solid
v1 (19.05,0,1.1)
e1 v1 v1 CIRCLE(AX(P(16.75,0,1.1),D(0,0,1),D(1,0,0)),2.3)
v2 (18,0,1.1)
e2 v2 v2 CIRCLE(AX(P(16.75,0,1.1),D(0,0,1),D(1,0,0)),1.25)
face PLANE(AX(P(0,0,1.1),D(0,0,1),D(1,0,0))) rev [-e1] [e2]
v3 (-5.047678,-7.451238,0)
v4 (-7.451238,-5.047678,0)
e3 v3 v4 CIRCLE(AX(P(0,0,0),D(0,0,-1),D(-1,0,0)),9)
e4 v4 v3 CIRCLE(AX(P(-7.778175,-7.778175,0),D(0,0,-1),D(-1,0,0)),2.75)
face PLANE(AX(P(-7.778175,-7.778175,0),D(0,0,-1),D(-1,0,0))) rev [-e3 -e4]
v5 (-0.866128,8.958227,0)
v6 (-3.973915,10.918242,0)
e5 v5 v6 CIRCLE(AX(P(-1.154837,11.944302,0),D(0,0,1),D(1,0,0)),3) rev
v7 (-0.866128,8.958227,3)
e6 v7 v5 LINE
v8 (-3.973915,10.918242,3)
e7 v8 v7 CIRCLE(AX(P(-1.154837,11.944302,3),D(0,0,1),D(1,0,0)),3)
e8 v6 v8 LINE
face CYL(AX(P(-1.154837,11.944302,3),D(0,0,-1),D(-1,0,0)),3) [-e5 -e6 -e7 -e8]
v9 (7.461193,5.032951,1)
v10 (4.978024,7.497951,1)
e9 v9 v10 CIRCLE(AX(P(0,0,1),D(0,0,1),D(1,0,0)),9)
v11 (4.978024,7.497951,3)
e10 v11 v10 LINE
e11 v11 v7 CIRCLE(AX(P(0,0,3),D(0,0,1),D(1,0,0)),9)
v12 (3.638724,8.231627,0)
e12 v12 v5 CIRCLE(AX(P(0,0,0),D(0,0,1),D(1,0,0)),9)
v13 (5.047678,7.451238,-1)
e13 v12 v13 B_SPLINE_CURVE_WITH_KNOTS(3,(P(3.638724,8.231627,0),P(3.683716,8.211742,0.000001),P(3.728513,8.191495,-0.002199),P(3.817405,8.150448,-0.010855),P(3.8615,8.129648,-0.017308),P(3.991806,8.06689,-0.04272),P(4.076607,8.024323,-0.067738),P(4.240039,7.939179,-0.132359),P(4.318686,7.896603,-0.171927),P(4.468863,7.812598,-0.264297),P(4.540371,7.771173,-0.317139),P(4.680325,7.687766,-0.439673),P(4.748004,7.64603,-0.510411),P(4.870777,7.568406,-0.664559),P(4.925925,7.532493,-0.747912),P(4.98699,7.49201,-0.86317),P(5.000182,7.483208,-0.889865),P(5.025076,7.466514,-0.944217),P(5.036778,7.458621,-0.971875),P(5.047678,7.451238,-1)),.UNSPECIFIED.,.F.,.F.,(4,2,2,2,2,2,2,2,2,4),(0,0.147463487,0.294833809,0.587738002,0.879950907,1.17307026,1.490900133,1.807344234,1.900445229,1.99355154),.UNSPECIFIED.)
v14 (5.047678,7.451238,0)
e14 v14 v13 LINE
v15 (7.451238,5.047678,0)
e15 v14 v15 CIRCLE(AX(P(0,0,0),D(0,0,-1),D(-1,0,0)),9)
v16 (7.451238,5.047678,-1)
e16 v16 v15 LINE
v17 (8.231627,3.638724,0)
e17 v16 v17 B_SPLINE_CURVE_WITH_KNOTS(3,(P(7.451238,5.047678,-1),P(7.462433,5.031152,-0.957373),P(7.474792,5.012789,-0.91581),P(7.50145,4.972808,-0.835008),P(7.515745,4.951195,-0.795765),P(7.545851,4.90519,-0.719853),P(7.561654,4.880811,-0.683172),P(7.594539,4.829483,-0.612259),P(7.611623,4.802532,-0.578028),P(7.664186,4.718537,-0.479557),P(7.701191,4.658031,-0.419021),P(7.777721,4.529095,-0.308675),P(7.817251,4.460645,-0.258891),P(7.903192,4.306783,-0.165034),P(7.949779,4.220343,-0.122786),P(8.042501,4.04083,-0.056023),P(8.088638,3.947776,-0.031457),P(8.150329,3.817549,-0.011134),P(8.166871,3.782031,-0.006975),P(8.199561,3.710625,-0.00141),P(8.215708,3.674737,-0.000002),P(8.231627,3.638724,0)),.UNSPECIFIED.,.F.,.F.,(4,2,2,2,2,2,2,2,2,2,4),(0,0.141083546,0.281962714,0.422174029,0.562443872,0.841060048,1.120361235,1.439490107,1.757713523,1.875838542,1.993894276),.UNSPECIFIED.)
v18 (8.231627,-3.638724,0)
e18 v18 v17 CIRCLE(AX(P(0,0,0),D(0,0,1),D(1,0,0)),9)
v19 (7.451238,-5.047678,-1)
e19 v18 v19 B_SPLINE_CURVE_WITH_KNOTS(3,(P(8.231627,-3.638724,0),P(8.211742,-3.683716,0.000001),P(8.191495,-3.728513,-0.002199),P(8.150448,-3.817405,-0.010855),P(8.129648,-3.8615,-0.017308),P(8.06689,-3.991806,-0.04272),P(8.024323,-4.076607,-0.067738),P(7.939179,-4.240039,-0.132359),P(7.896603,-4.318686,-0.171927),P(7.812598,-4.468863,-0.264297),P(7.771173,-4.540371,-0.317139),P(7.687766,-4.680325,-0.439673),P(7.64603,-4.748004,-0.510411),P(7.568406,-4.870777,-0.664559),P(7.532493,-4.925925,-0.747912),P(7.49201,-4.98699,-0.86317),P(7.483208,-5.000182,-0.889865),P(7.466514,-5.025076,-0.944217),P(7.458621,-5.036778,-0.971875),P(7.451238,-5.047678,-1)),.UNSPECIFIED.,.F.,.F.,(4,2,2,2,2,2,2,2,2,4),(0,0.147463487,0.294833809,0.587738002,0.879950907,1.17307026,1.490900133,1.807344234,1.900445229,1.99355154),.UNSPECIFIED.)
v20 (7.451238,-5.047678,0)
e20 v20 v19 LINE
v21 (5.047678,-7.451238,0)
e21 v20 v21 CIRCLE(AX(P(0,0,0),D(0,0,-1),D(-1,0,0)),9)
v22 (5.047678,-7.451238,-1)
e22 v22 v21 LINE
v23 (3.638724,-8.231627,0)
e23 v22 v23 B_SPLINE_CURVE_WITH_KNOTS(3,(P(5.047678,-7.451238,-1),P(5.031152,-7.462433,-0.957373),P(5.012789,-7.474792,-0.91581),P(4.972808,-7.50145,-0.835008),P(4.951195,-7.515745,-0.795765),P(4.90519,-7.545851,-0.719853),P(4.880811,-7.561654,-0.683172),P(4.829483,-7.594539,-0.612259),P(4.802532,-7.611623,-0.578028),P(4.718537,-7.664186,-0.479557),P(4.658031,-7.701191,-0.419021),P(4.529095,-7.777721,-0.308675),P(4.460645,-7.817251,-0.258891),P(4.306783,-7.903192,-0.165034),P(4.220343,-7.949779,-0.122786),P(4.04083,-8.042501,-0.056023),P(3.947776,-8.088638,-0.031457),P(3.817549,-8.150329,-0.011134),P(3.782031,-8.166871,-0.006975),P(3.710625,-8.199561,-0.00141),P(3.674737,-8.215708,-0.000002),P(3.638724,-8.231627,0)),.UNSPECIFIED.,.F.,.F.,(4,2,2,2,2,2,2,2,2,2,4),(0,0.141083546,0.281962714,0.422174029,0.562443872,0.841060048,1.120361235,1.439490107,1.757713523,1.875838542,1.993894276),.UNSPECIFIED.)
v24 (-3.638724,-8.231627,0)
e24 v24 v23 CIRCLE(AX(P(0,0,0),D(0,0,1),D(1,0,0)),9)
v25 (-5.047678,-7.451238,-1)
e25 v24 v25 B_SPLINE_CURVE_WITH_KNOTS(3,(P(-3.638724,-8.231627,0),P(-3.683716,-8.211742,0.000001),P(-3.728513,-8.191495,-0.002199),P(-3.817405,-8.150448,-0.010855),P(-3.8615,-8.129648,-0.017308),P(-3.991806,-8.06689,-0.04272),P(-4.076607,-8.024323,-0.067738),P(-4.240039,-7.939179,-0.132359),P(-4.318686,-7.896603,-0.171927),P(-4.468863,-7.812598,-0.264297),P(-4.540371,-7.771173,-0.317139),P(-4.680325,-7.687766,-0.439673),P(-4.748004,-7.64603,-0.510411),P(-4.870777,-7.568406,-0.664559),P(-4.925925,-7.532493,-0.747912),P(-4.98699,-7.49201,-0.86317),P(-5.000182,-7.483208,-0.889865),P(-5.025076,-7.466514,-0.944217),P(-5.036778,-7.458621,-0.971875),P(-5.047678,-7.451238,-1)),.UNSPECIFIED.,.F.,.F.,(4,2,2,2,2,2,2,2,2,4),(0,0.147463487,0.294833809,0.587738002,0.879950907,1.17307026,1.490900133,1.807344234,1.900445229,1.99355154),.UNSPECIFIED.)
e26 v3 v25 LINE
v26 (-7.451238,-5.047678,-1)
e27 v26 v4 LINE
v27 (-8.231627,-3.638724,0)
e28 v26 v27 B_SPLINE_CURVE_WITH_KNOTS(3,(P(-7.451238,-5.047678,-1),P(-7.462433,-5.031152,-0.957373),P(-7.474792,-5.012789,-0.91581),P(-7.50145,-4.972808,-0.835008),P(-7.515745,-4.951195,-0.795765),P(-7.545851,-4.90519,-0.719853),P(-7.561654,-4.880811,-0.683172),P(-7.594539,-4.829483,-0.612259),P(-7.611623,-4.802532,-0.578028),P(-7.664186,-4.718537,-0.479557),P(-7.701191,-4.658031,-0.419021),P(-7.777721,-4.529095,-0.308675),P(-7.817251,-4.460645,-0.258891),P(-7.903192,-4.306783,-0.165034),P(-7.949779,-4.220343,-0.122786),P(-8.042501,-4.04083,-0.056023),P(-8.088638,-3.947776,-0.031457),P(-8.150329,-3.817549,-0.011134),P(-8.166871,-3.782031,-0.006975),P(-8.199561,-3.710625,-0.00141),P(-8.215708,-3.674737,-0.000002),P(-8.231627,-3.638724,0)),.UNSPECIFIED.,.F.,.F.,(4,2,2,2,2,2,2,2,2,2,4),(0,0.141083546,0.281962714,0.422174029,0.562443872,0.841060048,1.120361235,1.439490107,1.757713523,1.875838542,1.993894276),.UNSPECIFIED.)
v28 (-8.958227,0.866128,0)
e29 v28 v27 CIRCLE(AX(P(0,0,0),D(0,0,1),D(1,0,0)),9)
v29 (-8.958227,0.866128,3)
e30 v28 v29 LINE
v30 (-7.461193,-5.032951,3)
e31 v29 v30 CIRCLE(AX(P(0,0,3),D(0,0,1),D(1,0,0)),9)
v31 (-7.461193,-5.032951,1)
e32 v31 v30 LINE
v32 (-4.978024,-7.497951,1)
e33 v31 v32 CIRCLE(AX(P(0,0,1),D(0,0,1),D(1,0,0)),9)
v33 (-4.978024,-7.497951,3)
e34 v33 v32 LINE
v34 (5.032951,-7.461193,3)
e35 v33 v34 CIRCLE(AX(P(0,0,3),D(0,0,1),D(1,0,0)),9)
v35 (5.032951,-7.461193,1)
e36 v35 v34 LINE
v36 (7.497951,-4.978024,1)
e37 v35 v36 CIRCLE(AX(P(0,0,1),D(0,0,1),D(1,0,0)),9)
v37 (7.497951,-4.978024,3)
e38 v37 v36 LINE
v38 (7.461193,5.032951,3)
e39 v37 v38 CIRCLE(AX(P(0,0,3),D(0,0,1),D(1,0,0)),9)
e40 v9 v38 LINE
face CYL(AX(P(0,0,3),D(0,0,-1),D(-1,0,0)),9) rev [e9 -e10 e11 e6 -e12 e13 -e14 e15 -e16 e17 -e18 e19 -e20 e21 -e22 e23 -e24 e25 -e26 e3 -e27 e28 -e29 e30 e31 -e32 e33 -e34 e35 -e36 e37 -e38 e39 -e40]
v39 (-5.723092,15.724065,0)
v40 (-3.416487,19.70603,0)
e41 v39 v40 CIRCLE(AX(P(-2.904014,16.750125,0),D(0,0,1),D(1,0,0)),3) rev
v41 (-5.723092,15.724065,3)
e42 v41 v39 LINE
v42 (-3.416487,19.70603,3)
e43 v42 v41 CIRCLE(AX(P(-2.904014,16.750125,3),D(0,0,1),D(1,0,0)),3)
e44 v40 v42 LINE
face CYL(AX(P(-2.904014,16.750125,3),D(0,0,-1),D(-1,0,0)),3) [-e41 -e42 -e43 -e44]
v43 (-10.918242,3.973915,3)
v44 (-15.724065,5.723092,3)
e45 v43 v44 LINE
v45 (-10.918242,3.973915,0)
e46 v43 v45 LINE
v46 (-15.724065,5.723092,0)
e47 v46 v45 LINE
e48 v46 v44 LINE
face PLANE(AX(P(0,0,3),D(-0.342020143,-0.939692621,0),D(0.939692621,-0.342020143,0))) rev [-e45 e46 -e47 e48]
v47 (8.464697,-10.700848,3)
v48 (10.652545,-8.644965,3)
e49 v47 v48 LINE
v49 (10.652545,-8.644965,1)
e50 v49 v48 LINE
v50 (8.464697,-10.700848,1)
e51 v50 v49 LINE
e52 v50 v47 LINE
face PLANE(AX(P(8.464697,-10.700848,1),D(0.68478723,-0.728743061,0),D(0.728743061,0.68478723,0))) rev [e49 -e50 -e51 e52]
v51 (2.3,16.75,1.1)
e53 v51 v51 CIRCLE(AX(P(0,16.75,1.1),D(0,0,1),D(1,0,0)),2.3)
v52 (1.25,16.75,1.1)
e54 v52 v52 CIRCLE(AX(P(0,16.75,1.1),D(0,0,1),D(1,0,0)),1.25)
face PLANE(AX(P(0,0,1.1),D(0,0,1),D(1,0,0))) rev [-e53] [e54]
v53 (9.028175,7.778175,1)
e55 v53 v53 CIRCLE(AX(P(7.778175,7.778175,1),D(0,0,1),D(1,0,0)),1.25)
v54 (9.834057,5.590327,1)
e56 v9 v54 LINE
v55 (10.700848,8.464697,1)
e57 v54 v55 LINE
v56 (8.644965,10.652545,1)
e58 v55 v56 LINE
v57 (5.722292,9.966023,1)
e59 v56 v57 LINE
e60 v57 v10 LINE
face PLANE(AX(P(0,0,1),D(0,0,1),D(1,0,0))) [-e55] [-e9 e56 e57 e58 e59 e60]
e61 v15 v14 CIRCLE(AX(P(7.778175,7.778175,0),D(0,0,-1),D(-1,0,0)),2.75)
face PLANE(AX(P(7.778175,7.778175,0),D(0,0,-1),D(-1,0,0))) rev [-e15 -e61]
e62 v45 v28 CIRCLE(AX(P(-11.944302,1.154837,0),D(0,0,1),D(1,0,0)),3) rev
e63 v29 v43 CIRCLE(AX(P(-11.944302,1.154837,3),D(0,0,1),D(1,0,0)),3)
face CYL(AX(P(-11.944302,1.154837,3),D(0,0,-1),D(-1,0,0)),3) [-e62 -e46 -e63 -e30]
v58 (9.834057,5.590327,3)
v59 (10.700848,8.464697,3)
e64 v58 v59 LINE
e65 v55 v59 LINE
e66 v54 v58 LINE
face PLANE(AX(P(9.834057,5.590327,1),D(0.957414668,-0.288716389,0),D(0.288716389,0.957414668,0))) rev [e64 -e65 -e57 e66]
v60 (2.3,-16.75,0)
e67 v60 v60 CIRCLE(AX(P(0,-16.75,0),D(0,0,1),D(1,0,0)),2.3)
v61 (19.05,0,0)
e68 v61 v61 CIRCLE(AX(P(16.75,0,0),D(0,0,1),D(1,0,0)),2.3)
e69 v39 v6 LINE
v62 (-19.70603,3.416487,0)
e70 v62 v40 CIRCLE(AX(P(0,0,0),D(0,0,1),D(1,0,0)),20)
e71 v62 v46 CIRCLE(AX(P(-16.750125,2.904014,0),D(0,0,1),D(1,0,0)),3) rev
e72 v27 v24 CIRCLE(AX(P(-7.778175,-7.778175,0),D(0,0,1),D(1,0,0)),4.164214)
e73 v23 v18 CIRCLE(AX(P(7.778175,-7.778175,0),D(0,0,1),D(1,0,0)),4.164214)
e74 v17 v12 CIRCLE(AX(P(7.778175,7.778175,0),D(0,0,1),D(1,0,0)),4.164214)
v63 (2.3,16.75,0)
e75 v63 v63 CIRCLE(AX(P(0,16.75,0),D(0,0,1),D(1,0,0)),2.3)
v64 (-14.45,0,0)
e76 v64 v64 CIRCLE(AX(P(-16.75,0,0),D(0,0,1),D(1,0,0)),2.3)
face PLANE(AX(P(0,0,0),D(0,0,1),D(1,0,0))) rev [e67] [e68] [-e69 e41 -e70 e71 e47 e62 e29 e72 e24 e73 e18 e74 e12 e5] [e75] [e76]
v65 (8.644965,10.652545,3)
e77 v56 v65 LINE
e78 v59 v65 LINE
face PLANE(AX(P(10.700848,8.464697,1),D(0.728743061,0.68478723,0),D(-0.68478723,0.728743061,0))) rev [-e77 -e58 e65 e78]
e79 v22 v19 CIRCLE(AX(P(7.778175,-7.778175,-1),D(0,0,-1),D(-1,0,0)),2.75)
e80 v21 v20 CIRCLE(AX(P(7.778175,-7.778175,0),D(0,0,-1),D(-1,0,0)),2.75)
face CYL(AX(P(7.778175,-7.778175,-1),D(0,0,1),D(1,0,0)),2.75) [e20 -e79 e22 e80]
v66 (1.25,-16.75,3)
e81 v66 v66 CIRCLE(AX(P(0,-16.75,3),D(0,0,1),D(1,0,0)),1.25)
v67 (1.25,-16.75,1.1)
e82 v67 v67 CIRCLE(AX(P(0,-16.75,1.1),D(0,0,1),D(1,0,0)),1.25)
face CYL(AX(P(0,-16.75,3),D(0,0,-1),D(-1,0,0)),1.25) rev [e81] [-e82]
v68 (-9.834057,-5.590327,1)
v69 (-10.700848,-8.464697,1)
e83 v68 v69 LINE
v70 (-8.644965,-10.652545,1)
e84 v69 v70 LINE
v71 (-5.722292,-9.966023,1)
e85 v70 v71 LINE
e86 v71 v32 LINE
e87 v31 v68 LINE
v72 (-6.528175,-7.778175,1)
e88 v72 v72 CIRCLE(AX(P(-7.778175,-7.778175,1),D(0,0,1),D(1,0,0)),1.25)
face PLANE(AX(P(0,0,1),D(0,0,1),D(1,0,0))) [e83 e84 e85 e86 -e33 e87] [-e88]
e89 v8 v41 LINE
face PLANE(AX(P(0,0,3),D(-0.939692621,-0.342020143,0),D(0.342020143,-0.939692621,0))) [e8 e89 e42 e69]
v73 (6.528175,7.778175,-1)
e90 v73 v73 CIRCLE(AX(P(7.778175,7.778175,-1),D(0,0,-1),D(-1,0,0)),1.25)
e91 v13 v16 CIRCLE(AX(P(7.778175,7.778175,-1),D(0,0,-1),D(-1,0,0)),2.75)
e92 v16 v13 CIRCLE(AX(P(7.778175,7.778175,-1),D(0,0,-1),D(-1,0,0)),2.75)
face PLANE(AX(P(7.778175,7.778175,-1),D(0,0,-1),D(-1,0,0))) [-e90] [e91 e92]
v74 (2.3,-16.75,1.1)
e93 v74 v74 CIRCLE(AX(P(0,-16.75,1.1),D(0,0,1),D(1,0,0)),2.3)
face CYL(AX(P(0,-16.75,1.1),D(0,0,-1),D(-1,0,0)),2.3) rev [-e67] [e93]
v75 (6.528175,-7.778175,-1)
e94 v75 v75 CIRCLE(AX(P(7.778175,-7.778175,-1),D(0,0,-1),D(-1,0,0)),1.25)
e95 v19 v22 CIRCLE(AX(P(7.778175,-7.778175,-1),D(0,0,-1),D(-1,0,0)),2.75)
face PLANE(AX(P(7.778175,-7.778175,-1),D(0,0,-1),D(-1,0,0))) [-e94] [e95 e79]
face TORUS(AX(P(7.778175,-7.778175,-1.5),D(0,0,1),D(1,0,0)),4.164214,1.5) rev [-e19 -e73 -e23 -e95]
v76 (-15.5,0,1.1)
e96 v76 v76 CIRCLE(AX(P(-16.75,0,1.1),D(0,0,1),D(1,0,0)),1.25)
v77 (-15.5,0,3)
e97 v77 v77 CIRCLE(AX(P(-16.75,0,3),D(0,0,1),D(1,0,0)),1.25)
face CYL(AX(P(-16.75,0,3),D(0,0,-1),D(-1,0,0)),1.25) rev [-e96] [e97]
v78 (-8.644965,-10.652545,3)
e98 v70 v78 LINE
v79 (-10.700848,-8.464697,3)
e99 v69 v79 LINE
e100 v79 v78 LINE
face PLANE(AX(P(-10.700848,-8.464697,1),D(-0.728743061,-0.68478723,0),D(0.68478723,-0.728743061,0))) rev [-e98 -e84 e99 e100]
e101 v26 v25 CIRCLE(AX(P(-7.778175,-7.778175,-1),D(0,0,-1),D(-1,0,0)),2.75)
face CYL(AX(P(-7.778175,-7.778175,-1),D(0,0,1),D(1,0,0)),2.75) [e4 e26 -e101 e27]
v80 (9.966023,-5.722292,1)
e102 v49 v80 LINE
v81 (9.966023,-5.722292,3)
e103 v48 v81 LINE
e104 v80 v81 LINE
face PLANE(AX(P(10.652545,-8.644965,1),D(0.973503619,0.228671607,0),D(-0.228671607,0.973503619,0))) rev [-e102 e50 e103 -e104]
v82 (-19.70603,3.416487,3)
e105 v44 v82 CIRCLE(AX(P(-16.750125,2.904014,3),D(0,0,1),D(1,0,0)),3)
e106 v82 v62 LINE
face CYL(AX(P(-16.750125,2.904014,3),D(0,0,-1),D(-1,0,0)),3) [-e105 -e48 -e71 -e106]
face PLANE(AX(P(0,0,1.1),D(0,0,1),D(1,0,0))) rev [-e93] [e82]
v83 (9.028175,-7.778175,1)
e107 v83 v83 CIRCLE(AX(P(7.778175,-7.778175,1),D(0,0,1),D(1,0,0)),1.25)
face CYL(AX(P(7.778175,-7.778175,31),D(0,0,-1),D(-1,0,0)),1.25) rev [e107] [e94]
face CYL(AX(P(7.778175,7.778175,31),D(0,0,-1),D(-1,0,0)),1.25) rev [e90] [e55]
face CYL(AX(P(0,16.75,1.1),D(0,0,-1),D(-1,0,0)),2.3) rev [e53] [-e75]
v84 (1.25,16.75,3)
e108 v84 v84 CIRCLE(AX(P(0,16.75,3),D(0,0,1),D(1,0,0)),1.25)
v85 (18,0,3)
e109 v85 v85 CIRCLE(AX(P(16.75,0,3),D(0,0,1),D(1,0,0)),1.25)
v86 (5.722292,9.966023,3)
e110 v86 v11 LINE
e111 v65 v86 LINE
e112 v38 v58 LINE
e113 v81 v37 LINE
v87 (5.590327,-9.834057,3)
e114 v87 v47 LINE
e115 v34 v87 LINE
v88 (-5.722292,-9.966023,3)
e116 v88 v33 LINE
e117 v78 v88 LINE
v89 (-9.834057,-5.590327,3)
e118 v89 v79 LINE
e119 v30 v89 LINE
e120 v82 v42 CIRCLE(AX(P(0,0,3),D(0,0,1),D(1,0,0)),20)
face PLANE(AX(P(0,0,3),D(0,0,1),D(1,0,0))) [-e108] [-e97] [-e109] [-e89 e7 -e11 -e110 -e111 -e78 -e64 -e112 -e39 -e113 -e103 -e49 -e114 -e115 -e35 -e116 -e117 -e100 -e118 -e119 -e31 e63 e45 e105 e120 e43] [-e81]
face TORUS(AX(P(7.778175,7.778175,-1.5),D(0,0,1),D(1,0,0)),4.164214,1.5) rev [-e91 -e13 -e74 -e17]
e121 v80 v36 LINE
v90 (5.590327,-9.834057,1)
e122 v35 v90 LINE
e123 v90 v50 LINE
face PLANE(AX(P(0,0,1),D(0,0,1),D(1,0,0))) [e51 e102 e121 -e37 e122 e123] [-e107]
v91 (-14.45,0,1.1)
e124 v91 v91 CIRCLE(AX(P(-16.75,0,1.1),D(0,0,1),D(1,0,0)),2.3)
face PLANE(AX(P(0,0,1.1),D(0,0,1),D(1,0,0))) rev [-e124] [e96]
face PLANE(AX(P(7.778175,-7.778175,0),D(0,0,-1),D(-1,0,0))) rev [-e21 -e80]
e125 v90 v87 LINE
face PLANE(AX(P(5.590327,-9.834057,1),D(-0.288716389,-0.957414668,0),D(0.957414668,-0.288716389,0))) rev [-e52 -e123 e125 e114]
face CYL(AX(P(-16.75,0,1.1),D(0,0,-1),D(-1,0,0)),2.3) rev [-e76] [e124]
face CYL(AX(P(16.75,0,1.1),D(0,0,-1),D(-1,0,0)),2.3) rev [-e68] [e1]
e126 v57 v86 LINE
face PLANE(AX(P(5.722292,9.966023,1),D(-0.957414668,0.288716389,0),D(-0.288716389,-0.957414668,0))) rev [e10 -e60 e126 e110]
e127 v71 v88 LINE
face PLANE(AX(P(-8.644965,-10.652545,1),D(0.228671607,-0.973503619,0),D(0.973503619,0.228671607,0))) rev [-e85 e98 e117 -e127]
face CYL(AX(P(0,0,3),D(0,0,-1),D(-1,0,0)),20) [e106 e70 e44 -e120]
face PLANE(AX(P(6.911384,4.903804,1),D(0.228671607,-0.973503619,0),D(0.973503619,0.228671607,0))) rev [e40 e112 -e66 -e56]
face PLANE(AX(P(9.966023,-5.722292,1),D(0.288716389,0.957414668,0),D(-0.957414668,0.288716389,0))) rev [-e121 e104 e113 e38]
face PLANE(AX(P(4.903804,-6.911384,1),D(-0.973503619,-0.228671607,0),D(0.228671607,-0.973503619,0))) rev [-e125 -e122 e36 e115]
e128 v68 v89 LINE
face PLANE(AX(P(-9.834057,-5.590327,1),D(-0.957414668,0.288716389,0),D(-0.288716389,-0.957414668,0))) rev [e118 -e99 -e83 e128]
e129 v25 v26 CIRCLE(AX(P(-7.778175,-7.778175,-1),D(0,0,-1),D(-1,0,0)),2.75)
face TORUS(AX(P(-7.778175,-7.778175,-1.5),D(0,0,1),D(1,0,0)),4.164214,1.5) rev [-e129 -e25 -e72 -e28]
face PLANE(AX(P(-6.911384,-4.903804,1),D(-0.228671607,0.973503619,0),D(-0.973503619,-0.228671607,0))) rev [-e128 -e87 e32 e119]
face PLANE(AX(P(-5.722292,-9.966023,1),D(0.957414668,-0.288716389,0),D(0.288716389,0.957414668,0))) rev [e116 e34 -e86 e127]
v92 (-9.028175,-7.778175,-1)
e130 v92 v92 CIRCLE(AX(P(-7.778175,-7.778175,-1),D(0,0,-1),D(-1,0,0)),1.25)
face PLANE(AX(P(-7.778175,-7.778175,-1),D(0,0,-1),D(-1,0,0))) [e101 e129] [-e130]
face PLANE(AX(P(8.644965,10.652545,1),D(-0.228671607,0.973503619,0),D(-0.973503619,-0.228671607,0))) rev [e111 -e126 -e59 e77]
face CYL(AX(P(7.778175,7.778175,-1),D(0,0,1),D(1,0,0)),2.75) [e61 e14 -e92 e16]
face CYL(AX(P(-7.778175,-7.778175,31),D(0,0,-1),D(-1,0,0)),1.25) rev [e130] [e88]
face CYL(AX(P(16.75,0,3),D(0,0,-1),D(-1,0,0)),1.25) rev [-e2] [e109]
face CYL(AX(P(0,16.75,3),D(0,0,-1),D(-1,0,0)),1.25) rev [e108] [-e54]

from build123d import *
from build123d.topology import SkipClean

# Parameters (mm, degrees)
SKETCH_1_R               = 20
SKETCH_1_R_2             = 1.25
SKETCH_1_R_3             = 9
EXTRUDE_5_DEPTH          = 3
SKETCH_1_6_R             = 9
SKETCH_1_6_R_2           = 2.3
SKETCH_1_6_R_3           = 1.25
CUT_EXTRUDE_1_DEPTH      = 1.1
SKETCH_2_R               = 1.25
CUT_EXTRUDE_2_DEPTH      = 31
EXTRUDE_START            = 1
SKETCH_3_R               = 2.75
SKETCH_3_R_2             = 1.25
EXTRUDE_6_DEPTH          = 1
FILLET_1_R               = 1.5
CUT_EXTRUDE_3_DEPTH      = 2
CUT_EXTRUDE_4_DEPTH      = 29.442925317
CUT_EXTRUDE_4_DEPTH_BACK = 29.442925317
FILLET_2_R               = 3


with BuildPart() as part:
    # 草图1 → 凸台-拉伸5 (new body)
    with BuildSketch(Plane.XY):
        Circle(SKETCH_1_R)
        with Locations((0, 16.75)):
            Circle(SKETCH_1_R_2, mode=Mode.SUBTRACT)
        with Locations((16.75, 0)):
            Circle(SKETCH_1_R_2, mode=Mode.SUBTRACT)
        with Locations((0, -16.75)):
            Circle(SKETCH_1_R_2, mode=Mode.SUBTRACT)
        with Locations((-16.75, 0)):
            Circle(SKETCH_1_R_2, mode=Mode.SUBTRACT)
        Circle(SKETCH_1_R_3, mode=Mode.SUBTRACT)
    extrude(amount=EXTRUDE_5_DEPTH)

    # 草图1<6> → 切除-拉伸1 (cut)
    # profile 1 of 8: a face of its own
    with BuildSketch(Plane.XY):
        Circle(SKETCH_1_6_R)
    # profile 2 of 8: a face of its own
    with BuildSketch(Plane.XY):
        with Locations((16.75, 0)):
            Circle(SKETCH_1_6_R_2)
        with Locations((16.75, 0)):
            Circle(SKETCH_1_6_R_3, mode=Mode.SUBTRACT)
    # profile 3 of 8: a face of its own
    with BuildSketch(Plane.XY):
        Circle(SKETCH_1_6_R)
    # profile 4 of 8: a face of its own
    with BuildSketch(Plane.XY):
        with Locations((0, 16.75)):
            Circle(SKETCH_1_6_R_2)
        with Locations((0, 16.75)):
            Circle(SKETCH_1_6_R_3, mode=Mode.SUBTRACT)
    # profile 5 of 8: a face of its own
    with BuildSketch(Plane.XY):
        Circle(SKETCH_1_6_R)
    # profile 6 of 8: a face of its own
    with BuildSketch(Plane.XY):
        with Locations((-16.75, 0)):
            Circle(SKETCH_1_6_R_2)
        with Locations((-16.75, 0)):
            Circle(SKETCH_1_6_R_3, mode=Mode.SUBTRACT)
    # profile 7 of 8: a face of its own
    with BuildSketch(Plane.XY):
        Circle(SKETCH_1_6_R)
    # profile 8 of 8: a face of its own
    with BuildSketch(Plane.XY):
        with Locations((0, -16.75)):
            Circle(SKETCH_1_6_R_2)
        with Locations((0, -16.75)):
            Circle(SKETCH_1_6_R_3, mode=Mode.SUBTRACT)
    extrude(amount=CUT_EXTRUDE_1_DEPTH, mode=Mode.SUBTRACT)

    # 草图2 → 切除-拉伸2 (cut)
    with BuildSketch(Plane.XY):
        with Locations((-7.778174593, 7.778174593)):
            Circle(SKETCH_2_R)
        with Locations((7.778174593, 7.778174593)):
            Circle(SKETCH_2_R)
        with Locations((7.778174593, -7.778174593)):
            Circle(SKETCH_2_R)
        with Locations((-7.778174593, -7.778174593)):
            Circle(SKETCH_2_R)
    extrude(amount=CUT_EXTRUDE_2_DEPTH, mode=Mode.SUBTRACT)

    # 草图3 → 凸台-拉伸6 (add)
    # profile 1 of 4: a face of its own
    with SkipClean():  # the faces are left unmerged after this step: merging them gives an invalid solid
        with BuildSketch(Plane(origin=(0, 0, 0), x_dir=(-1, 0, 0), z_dir=(0, 0, -1)).offset(EXTRUDE_START)):
            with Locations(Location((7.778174593, 7.778174593, 0), (0, 0, 186.827815893))):
                Circle(SKETCH_3_R)
            with Locations((7.778174593, 7.778174593)):
                Circle(SKETCH_3_R_2, mode=Mode.SUBTRACT)
        # profile 2 of 4: a face of its own
        with BuildSketch(Plane(origin=(0, 0, 0), x_dir=(-1, 0, 0), z_dir=(0, 0, -1)).offset(EXTRUDE_START)):
            with Locations(Location((7.778174593, -7.778174593, 0), (0, 0, 173.172184107))):
                Circle(SKETCH_3_R)
            with Locations((7.778174593, -7.778174593)):
                Circle(SKETCH_3_R_2, mode=Mode.SUBTRACT)
        # profile 3 of 4: a face of its own
        with BuildSketch(Plane(origin=(0, 0, 0), x_dir=(-1, 0, 0), z_dir=(0, 0, -1)).offset(EXTRUDE_START)):
            with Locations(Location((-7.778174593, -7.778174593, 0), (0, 0, 83.172184107))):
                Circle(SKETCH_3_R)
            with Locations((-7.778174593, -7.778174593)):
                Circle(SKETCH_3_R_2, mode=Mode.SUBTRACT)
        # profile 4 of 4: a face of its own
        with BuildSketch(Plane(origin=(0, 0, 0), x_dir=(-1, 0, 0), z_dir=(0, 0, -1)).offset(EXTRUDE_START)):
            with Locations(Location((-7.778174593, 7.778174593, 0), (0, 0, 276.827815893))):
                Circle(SKETCH_3_R)
            with Locations((-7.778174593, 7.778174593)):
                Circle(SKETCH_3_R_2, mode=Mode.SUBTRACT)
        extrude(amount=-EXTRUDE_6_DEPTH)

    # 圆角1
    # the kernel refuses this fillet: 1.5 mm, written as the material it adds along each edge
    with BuildSketch(Plane(origin=(-7.778174593, 7.778174593, 0), x_dir=(0.7048818539428432, -0.709324729571795, 0), z_dir=(0.709324729571795, 0.7048818539428432, 0))) as fillet_1_piece_1_section:
        with BuildLine():
            CenterArc((4.164213562, 1.5), FILLET_1_R, 199.471220634, 70.528779366)
            Line((2.75, 1), (2.75, 0))
            Line((2.75, 0), (4.164213562, 0))
        make_face()
    fillet_1_piece_1 = revolve(axis=Axis((-7.778174593, 7.778174593, 0), (0, 0, -1)), revolution_arc=359.64, mode=Mode.PRIVATE)
    fillet_1_piece_1 = fillet_1_piece_1 - Plane(origin=(0, 0, -0.272805639), x_dir=(1, 0, 0), z_dir=(0, 0, -1)) * Cylinder(9, 17, mode=Mode.PRIVATE)
    add(fillet_1_piece_1)
    with BuildSketch(Plane(origin=(-7.778174593, -7.778174593, 0), x_dir=(0.7093247295728082, 0.7048818539418237, 0), z_dir=(-0.7048818539418237, 0.7093247295728082, 0))) as fillet_1_piece_2_section:
        with BuildLine():
            CenterArc((4.164213562, 1.5), FILLET_1_R, 199.471220634, 70.528779366)
            Line((2.75, 1), (2.75, 0))
            Line((2.75, 0), (4.164213562, 0))
        make_face()
    fillet_1_piece_2 = revolve(axis=Axis((-7.778174593, -7.778174593, 0), (0, 0, -1)), revolution_arc=359.64, mode=Mode.PRIVATE)
    fillet_1_piece_2 = fillet_1_piece_2 - Plane(origin=(0, 0, -0.272805639), x_dir=(1, 0, 0), z_dir=(0, 0, -1)) * Cylinder(9, 17, mode=Mode.PRIVATE)
    add(fillet_1_piece_2)
    with BuildSketch(Plane(origin=(7.778174593, -7.778174593, 0), x_dir=(-0.7048818539418643, 0.7093247295727678, 0), z_dir=(-0.7093247295727678, -0.7048818539418643, 0))) as fillet_1_piece_3_section:
        with BuildLine():
            CenterArc((4.164213562, 1.5), FILLET_1_R, 199.471220634, 70.528779366)
            Line((2.75, 1), (2.75, 0))
            Line((2.75, 0), (4.164213562, 0))
        make_face()
    fillet_1_piece_3 = revolve(axis=Axis((7.778174593, -7.778174593, 0), (0, 0, -1)), revolution_arc=359.64, mode=Mode.PRIVATE)
    fillet_1_piece_3 = fillet_1_piece_3 - Plane(origin=(0, 0, -0.272805639), x_dir=(1, 0, 0), z_dir=(0, 0, -1)) * Cylinder(9, 17, mode=Mode.PRIVATE)
    add(fillet_1_piece_3)
    with BuildSketch(Plane(origin=(7.778174593, 7.778174593, 0), x_dir=(-0.7093247295718554, -0.7048818539427826, 0), z_dir=(0.7048818539427826, -0.7093247295718554, 0))) as fillet_1_piece_4_section:
        with BuildLine():
            CenterArc((4.164213562, 1.5), FILLET_1_R, 199.471220634, 70.528779366)
            Line((2.75, 1), (2.75, 0))
            Line((2.75, 0), (4.164213562, 0))
        make_face()
    fillet_1_piece_4 = revolve(axis=Axis((7.778174593, 7.778174593, 0), (0, 0, -1)), revolution_arc=359.64, mode=Mode.PRIVATE)
    fillet_1_piece_4 = fillet_1_piece_4 - Plane(origin=(0, 0, -0.272805639), x_dir=(1, 0, 0), z_dir=(0, 0, -1)) * Cylinder(9, 17, mode=Mode.PRIVATE)
    add(fillet_1_piece_4)

    # 草图4 → 切除-拉伸3 (cut)
    with BuildSketch(Plane.XY.offset(3)):
        Polygon((6.911384071, 4.903803788), (9.834057469, 5.590326579), (10.700847991, 8.464697384), (8.644965115, 10.652545398), (5.722291717, 9.966022607), (4.855501195, 7.091651802), align=None)
        Polygon((-8.464697384, 10.700847991), (-10.652545398, 8.644965115), (-9.966022607, 5.722291717), (-7.091651802, 4.855501195), (-4.903803788, 6.911384071), (-5.590326579, 9.834057469), align=None)
        Polygon((4.903803788, -6.911384071), (5.590326579, -9.834057469), (8.464697384, -10.700847991), (10.652545398, -8.644965115), (9.966022607, -5.722291717), (7.091651802, -4.855501195), align=None)
        Polygon((-6.911384071, -4.903803788), (-9.834057469, -5.590326579), (-10.700847991, -8.464697384), (-8.644965115, -10.652545398), (-5.722291717, -9.966022607), (-4.855501195, -7.091651802), align=None)
    extrude(amount=-CUT_EXTRUDE_3_DEPTH, mode=Mode.SUBTRACT)

    # 草图5 → 切除-拉伸4 (cut, two sides: drawn at the far end of the back side and taken through both)
    with BuildSketch(Plane(origin=(0, 0, 0), x_dir=(-1, 0, 0), z_dir=(0, 0, -1)).offset(-CUT_EXTRUDE_4_DEPTH_BACK)):
        with BuildLine():
            ThreePointArc((8.231627484, 3.638723534), (8.349136055, 3.360346282), (8.457233587, 3.07818129))
            Line((8.457233587, 3.07818129), (18.793852416, 6.840402867))
            ThreePointArc((18.793852416, 6.840402867), (16.867828916, 10.745992167), (14.142135624, 14.142135624))
            Line((14.142135624, 14.142135624), (10.722718241, 10.722718241))
            ThreePointArc((10.722718241, 10.722718241), (11.706576351, 6.396749887), (8.231627484, 3.638723534))
        make_face()
        with BuildLine():
            Line((6.840402867, 18.793852416), (3.07818129, 8.457233587))
            ThreePointArc((3.07818129, 8.457233587), (3.360346282, 8.349136055), (3.638723534, 8.231627484))
            ThreePointArc((3.638723534, 8.231627484), (6.396749887, 11.706576351), (10.722718241, 10.722718241))
            Line((10.722718241, 10.722718241), (14.142135624, 14.142135624))
            ThreePointArc((14.142135624, 14.142135624), (10.745992167, 16.867828916), (6.840402867, 18.793852416))
        make_face()
        with BuildLine():
            Line((3.07818129, 8.457233587), (0, 0))
            Line((0, 0), (10.722718241, 10.722718241))
            ThreePointArc((10.722718241, 10.722718241), (6.396749887, 11.706576351), (3.638723534, 8.231627484))
            ThreePointArc((3.638723534, 8.231627484), (3.360346282, 8.349136055), (3.07818129, 8.457233587))
        make_face()
        with BuildLine():
            Line((10.722718241, 10.722718241), (0, 0))
            Line((0, 0), (8.457233587, 3.07818129))
            ThreePointArc((8.457233587, 3.07818129), (8.349136055, 3.360346282), (8.231627484, 3.638723534))
            ThreePointArc((8.231627484, 3.638723534), (11.706576351, 6.396749887), (10.722718241, 10.722718241))
        make_face()
    extrude(amount=CUT_EXTRUDE_4_DEPTH + CUT_EXTRUDE_4_DEPTH_BACK, mode=Mode.SUBTRACT)

    # 圆角2
    fillet_2_edges = [part.edges().sort_by_distance(p)[0] for p in [
        (-6.840402867, 18.793852416, 1.5),
        (-18.793852416, 6.840402867, 1.5),
        (-3.07818129, 8.457233587, 1.5),
        (-8.457233587, 3.07818129, 1.5),
    ]]
    fillet(fillet_2_edges, radius=FILLET_2_R)


solid = part.part
